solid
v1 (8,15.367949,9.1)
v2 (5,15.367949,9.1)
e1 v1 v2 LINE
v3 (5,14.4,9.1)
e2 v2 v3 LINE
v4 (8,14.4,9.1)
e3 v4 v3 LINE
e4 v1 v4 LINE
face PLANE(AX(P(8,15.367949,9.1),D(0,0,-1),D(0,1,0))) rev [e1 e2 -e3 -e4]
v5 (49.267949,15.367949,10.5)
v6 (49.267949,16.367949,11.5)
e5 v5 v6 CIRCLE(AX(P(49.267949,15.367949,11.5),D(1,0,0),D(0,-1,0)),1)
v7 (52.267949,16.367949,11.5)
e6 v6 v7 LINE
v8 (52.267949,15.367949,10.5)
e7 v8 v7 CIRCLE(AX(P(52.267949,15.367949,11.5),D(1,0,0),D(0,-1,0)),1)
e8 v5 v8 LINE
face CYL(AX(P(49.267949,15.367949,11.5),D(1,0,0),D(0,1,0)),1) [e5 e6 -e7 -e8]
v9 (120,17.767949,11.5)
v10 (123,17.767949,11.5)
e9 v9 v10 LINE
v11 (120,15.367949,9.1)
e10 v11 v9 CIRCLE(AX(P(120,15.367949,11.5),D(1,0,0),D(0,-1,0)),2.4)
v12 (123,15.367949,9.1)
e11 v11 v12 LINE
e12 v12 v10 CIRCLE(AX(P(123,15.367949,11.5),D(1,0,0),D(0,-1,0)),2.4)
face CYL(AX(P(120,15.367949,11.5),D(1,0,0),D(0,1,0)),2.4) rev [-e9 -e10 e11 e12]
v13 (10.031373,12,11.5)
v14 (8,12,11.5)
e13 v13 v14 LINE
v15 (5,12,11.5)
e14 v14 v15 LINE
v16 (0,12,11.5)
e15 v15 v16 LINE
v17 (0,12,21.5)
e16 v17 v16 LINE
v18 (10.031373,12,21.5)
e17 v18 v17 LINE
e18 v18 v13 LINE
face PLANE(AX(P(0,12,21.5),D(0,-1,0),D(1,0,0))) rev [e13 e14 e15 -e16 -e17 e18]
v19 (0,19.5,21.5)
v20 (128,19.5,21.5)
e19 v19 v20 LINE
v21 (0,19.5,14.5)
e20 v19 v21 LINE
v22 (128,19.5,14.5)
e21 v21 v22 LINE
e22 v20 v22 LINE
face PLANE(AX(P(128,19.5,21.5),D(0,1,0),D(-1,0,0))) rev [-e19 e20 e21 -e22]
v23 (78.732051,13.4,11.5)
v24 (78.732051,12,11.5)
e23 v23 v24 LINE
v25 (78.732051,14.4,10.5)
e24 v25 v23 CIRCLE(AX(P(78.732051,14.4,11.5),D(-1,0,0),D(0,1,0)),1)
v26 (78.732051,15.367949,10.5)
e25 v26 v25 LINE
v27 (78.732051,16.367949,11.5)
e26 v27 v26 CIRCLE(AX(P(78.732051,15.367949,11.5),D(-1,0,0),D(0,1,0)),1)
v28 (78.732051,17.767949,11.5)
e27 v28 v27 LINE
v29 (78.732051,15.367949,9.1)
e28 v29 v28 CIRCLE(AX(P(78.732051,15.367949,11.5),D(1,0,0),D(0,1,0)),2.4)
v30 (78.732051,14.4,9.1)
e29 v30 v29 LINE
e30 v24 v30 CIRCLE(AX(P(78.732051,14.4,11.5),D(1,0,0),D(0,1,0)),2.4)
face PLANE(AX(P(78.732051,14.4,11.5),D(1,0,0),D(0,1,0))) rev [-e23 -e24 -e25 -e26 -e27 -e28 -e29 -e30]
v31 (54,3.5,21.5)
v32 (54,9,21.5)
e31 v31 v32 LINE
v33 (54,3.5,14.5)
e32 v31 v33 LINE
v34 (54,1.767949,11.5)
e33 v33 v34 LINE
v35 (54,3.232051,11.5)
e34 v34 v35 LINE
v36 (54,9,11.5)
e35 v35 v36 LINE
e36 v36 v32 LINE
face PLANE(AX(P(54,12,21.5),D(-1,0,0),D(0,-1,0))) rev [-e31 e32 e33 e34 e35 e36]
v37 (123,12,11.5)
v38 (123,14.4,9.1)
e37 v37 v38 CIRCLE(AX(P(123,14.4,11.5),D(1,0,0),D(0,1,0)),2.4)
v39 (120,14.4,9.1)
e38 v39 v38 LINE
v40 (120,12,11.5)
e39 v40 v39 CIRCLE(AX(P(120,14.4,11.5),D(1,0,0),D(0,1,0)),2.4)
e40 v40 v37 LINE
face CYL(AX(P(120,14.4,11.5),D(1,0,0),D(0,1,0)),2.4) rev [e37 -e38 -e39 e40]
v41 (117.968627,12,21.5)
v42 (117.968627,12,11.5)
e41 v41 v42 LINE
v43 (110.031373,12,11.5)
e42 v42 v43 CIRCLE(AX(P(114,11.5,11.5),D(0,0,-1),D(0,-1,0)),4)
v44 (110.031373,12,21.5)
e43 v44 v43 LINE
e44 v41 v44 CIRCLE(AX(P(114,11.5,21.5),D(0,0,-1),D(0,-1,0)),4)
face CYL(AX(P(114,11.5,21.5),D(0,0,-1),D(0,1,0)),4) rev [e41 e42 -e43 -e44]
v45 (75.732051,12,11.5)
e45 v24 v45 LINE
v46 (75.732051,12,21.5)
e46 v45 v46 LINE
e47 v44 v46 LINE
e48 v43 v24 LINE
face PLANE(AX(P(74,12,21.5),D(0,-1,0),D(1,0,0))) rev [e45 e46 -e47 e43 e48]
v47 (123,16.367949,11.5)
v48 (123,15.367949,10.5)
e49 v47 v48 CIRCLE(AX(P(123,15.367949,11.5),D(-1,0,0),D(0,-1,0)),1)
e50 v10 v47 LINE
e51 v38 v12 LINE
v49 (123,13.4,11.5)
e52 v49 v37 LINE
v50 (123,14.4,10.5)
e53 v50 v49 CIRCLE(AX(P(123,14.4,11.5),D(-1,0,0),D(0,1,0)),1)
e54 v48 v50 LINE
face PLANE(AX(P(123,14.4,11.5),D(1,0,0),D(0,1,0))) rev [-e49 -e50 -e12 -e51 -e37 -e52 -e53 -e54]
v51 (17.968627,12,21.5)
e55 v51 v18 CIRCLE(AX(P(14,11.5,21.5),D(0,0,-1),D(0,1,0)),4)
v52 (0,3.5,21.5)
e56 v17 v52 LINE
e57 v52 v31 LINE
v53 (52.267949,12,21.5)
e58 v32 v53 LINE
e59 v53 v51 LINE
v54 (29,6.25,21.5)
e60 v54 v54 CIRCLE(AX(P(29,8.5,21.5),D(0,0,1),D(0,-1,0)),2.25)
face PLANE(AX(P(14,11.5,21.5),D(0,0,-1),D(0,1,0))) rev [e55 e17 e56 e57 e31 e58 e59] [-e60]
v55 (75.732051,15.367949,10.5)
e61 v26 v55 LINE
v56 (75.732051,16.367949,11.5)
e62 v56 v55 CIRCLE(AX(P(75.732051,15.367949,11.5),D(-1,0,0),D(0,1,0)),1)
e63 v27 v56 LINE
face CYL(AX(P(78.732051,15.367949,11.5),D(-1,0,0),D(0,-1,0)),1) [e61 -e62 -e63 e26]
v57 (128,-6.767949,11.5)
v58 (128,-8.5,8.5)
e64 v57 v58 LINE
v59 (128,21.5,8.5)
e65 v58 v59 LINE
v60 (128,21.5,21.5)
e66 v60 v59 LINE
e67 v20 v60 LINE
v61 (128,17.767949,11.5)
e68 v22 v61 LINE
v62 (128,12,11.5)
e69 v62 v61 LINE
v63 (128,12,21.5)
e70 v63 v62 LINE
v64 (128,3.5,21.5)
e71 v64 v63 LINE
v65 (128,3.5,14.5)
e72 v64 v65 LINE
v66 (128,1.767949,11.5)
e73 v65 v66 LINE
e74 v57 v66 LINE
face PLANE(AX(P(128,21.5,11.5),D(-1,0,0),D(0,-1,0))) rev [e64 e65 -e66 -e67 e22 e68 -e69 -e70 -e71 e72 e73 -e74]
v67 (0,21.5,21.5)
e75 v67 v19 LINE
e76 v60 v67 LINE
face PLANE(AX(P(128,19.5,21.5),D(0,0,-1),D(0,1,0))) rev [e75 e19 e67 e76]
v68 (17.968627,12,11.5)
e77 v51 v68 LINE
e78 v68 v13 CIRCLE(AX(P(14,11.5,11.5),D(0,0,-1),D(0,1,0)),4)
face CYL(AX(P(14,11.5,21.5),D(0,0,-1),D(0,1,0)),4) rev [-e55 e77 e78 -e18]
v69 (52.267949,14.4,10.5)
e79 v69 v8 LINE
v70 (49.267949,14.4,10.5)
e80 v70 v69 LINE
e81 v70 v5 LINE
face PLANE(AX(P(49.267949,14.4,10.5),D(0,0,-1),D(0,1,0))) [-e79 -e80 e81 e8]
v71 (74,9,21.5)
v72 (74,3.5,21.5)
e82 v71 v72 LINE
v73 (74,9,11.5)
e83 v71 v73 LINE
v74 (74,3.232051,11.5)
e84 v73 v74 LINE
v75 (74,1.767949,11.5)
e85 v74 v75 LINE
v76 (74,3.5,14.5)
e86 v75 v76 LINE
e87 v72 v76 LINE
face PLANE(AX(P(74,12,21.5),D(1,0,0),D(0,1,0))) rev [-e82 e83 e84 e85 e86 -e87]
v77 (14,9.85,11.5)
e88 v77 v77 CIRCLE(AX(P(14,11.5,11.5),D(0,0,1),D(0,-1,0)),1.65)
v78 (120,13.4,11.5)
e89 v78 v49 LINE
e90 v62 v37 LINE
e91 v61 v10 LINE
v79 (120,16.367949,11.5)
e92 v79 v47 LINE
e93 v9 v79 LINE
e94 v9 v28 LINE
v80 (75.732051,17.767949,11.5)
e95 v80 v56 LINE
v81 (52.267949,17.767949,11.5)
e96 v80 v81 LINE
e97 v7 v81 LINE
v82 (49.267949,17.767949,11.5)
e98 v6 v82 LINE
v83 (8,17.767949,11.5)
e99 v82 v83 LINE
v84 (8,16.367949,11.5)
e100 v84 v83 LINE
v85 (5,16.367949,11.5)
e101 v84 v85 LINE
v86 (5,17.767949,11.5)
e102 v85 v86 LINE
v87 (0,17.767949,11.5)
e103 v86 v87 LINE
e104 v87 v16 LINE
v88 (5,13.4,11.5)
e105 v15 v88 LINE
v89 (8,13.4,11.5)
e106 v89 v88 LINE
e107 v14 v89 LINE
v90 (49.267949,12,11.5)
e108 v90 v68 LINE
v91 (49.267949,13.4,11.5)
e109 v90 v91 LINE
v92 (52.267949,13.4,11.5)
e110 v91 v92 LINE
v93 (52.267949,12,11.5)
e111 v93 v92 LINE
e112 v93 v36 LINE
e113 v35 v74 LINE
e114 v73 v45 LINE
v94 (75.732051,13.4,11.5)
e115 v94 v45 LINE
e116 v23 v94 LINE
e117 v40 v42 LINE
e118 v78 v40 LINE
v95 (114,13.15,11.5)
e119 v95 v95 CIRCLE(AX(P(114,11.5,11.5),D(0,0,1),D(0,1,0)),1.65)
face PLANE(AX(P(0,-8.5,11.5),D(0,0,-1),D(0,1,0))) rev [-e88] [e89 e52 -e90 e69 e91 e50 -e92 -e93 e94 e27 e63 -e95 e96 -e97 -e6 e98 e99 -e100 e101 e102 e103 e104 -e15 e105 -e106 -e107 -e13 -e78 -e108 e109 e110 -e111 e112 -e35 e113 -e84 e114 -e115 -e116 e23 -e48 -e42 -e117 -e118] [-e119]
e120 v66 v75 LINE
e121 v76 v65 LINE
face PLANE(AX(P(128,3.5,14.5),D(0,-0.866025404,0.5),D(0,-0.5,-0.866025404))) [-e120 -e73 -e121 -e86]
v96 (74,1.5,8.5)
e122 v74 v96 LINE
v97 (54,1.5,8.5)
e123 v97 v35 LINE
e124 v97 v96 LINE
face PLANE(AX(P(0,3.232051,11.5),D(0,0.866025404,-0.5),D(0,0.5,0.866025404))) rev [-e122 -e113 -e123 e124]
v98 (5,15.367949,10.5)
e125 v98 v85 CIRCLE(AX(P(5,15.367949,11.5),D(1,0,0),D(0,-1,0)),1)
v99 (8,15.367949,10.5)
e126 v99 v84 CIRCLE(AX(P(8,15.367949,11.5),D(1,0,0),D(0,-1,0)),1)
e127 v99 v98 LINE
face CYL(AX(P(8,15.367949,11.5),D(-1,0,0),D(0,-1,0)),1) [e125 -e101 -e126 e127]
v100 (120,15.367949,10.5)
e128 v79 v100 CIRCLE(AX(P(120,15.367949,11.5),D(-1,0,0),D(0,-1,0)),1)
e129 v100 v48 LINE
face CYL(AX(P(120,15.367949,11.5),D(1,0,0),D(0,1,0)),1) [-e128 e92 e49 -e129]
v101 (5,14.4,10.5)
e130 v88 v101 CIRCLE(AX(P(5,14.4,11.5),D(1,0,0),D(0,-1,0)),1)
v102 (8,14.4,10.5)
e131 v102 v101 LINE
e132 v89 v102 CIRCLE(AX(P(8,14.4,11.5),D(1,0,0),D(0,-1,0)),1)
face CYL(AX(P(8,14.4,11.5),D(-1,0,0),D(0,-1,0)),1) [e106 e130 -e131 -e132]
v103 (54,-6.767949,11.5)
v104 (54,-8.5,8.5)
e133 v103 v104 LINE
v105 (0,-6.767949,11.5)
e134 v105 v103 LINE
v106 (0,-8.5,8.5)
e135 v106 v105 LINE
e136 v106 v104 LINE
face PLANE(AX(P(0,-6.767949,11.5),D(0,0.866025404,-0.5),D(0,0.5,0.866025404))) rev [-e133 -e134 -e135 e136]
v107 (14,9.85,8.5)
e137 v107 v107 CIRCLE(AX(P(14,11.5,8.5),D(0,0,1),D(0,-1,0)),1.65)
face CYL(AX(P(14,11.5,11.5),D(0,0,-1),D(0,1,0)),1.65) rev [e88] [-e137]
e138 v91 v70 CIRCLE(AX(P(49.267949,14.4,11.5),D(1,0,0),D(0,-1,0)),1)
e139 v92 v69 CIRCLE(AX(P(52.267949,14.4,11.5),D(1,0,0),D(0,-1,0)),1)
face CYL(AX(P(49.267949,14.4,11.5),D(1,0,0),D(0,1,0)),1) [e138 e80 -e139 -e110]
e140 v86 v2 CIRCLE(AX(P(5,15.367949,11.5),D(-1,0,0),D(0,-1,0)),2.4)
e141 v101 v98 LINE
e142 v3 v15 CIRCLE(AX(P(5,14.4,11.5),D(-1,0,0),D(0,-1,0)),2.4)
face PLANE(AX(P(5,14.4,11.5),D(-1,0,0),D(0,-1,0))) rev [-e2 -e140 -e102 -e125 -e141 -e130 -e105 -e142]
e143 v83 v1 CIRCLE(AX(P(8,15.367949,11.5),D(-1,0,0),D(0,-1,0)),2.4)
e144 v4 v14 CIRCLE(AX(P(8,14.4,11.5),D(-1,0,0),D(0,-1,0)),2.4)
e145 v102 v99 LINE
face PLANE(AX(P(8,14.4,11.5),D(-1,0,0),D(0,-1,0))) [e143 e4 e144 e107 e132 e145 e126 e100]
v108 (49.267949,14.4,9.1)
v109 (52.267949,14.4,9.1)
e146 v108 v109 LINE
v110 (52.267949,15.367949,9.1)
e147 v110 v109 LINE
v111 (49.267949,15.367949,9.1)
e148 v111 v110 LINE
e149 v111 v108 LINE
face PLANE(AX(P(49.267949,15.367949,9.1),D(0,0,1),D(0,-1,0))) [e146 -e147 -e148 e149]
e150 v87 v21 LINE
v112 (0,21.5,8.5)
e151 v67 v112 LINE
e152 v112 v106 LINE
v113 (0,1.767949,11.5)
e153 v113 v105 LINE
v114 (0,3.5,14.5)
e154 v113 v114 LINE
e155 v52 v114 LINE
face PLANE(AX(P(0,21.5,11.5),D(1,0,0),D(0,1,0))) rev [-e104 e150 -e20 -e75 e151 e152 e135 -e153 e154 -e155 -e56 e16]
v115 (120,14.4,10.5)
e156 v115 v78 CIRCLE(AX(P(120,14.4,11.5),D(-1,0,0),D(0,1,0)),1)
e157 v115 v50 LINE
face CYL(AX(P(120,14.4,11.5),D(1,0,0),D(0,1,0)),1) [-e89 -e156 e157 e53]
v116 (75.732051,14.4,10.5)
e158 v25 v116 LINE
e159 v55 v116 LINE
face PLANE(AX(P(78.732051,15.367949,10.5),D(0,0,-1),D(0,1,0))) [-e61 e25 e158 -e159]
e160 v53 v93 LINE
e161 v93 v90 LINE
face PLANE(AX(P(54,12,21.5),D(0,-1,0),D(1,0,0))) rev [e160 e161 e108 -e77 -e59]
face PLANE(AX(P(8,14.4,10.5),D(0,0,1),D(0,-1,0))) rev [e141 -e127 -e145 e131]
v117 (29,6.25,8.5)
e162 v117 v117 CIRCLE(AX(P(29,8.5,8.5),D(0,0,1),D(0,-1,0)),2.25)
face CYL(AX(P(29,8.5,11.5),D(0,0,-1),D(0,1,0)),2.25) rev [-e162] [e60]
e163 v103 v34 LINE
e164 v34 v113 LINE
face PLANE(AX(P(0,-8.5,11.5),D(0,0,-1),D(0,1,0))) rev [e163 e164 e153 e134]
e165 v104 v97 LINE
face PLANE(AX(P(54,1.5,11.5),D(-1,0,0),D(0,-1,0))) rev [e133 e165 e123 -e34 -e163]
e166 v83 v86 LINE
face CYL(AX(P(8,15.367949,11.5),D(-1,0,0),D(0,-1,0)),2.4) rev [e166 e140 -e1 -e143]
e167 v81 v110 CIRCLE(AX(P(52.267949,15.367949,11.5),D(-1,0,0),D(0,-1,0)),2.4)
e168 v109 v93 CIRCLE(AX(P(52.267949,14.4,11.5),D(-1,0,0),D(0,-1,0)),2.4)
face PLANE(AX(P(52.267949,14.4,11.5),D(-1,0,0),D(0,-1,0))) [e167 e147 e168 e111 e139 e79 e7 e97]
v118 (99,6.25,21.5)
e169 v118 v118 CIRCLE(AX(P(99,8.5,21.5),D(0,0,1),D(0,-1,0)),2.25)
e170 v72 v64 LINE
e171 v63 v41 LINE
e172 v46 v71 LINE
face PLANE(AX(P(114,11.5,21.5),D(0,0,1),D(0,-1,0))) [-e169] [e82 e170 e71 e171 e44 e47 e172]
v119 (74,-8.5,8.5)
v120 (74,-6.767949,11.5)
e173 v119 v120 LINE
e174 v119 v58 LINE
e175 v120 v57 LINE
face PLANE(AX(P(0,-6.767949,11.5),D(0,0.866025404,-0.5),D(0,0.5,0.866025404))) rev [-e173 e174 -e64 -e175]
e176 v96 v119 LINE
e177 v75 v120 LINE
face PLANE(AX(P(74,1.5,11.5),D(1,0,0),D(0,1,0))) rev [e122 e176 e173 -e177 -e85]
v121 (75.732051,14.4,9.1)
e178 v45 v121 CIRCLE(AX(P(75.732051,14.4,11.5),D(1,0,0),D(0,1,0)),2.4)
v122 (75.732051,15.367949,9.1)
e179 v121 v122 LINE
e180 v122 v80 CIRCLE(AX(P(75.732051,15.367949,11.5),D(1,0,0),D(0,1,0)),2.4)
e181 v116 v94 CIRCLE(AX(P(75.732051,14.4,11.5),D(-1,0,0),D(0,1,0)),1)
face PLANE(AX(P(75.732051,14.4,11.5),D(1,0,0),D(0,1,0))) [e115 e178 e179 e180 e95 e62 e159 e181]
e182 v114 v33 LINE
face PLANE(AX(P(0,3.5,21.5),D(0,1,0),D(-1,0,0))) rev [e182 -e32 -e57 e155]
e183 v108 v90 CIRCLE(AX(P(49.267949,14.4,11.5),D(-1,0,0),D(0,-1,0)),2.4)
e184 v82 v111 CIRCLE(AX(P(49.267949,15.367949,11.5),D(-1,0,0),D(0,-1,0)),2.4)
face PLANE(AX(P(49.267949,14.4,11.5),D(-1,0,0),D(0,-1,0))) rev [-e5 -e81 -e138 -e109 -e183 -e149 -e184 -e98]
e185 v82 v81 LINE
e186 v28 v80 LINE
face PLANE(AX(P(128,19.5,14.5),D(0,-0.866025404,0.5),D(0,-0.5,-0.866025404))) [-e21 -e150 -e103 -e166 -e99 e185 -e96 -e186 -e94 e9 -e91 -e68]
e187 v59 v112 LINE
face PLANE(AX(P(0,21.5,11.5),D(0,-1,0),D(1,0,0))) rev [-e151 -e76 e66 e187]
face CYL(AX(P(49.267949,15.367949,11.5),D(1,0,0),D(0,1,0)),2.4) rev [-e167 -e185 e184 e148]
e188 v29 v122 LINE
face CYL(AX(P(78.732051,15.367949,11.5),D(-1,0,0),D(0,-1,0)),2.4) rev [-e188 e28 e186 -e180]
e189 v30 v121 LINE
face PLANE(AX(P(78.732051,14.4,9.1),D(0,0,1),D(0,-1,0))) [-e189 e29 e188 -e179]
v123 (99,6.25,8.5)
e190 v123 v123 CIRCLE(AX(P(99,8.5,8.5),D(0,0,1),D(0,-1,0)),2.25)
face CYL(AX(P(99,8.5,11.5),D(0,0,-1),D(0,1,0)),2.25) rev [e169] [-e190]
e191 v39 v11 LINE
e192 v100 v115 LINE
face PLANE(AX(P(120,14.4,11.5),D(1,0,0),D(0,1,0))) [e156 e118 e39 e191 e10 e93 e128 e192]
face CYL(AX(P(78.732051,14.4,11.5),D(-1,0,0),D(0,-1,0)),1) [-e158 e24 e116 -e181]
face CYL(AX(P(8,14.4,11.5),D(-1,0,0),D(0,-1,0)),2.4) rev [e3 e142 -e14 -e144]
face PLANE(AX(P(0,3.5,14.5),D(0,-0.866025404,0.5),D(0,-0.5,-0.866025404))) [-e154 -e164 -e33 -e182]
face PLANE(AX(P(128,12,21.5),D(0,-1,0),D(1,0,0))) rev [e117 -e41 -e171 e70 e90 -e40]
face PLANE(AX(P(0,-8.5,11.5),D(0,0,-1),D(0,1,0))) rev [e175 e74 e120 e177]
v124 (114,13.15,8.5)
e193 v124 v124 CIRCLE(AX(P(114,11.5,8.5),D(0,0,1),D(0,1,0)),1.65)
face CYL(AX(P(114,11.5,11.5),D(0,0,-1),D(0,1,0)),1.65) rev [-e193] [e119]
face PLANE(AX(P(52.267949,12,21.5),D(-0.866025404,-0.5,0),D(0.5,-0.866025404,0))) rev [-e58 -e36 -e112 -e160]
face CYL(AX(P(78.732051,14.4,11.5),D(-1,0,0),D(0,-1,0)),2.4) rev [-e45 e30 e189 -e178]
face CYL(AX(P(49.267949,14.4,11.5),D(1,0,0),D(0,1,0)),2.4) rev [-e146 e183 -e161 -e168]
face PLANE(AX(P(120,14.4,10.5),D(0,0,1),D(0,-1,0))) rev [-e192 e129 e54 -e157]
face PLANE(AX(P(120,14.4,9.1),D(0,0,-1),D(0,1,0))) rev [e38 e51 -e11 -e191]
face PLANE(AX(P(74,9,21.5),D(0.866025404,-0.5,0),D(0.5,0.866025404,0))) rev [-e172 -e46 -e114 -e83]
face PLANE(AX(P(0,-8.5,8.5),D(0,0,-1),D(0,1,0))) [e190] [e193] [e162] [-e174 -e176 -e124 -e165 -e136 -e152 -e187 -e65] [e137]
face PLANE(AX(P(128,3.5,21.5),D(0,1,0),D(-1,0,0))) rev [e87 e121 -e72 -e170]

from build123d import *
from OCP.BRepFilletAPI import BRepFilletAPI_MakeChamfer

# Parameters (mm, degrees)
SKIZZE1_R                          = 1.65
SKIZZE1_R_2                        = 2.25
AUFSATZ_LINEAR_AUSTRAGEN1_DEPTH    = 3
SKIZZE2_W                          = 128
SKIZZE2_H                          = 2
SKIZZE2_R                          = 2.25
AUFSATZ_LINEAR_AUSTRAGEN2_DEPTH    = 10
FASE1_SIZE                         = 1.732050808
FASE1_SIZE_2                       = 3
FASE2_SIZE                         = 1.732050808
FASE2_SIZE_2                       = 3
SCHNITT_LINEAR_START               = -5
SCHNITT_LINEAR_AUSTRAGEN1_DEPTH    = 3
SCHNITT_LINEAR_START_2             = -41.26795
SCHNITT_LINEAR_AUSTRAGEN2_DEPTH    = 3
SCHNITT_LINEAR_START_3             = -8
SCHNITT_LINEAR_AUSTRAGEN3_DEPTH    = 3
SCHNITT_LINEAR_START_4             = -44.26795
SCHNITT_LINEAR_AUSTRAGEN4_DEPTH    = 3
K_RPER_VERSCHIEBEN_KOPIEREN1_ANGLE = 90


# Some blends are built 0.0001 mm under size
with BuildPart() as part:
    # Skizze1 → Aufsatz-Linear austragen1 (new body)
    with BuildSketch(Plane(origin=(0, 0, 0), x_dir=(1, 0, 0), z_dir=(0, 1, 0))):
        Polygon((54, -20), (74, -20), (74, -30), (128, -30), (128, 0), (0, 0), (0, -30), (54, -30), align=None)
        with Locations(Location((114, -10, 0), (0, 0, 90))):
            Circle(SKIZZE1_R, mode=Mode.SUBTRACT)
        with Locations(Location((14, -10, 0), (0, 0, 270))):
            Circle(SKIZZE1_R, mode=Mode.SUBTRACT)
        with Locations(Location((29, -13, 0), (0, 0, 270))):
            Circle(SKIZZE1_R_2, mode=Mode.SUBTRACT)
        with Locations(Location((99, -13, 0), (0, 0, 270))):
            Circle(SKIZZE1_R_2, mode=Mode.SUBTRACT)
    extrude(amount=AUFSATZ_LINEAR_AUSTRAGEN1_DEPTH)

    # Skizze2 → Aufsatz-Linear austragen2 (add)
    # profile 1 of 3: a face of its own
    with BuildSketch(Plane(origin=(0, 3, 0), x_dir=(1, 0, 0), z_dir=(0, 1, 0))):
        with Locations((64, -1)):
            Rectangle(SKIZZE2_W, SKIZZE2_H)
    # profile 2 of 3: a face of its own
    with BuildSketch(Plane(origin=(0, 3, 0), x_dir=(1, 0, 0), z_dir=(0, 1, 0))):
        with BuildLine():
            Line((0, -9.5), (10.031373033, -9.5))
            ThreePointArc((10.031373033, -9.5), (14, -14), (17.968626967, -9.5))
            Line((17.968626967, -9.5), (54, -9.5))
            Line((54, -9.5), (54, -18))
            Line((54, -18), (0, -18))
            Line((0, -18), (0, -9.5))
        make_face()
        with Locations(Location((29, -13, 0), (0, 0, 270))):
            Circle(SKIZZE2_R, mode=Mode.SUBTRACT)
    # profile 3 of 3: a face of its own
    with BuildSketch(Plane(origin=(0, 3, 0), x_dir=(1, 0, 0), z_dir=(0, 1, 0))):
        with BuildLine():
            Line((128, -9.5), (128, -18))
            Line((128, -18), (74, -18))
            Line((74, -18), (74, -9.5))
            Line((74, -9.5), (110.031373033, -9.5))
            ThreePointArc((110.031373033, -9.5), (114, -14), (117.968626967, -9.5))
            Line((117.968626967, -9.5), (128, -9.5))
        make_face()
        with Locations(Location((99, -13, 0), (0, 0, 270))):
            Circle(SKIZZE2_R, mode=Mode.SUBTRACT)
    extrude(amount=AUFSATZ_LINEAR_AUSTRAGEN2_DEPTH)

    # Fase1
    fase1_edges_1 = [part.edges().sort_by_distance(p)[0] for p in [
        (54, 8, 9.5),
    ]]
    fase1_side_1 = [part.faces().sort_by_distance(p)[0] for p in [
        (53.965358984, 8, 9.5),
    ]]
    fase1_edges_2 = [part.edges().sort_by_distance(p)[0] for p in [
        (74, 8, 9.5),
    ]]
    fase1_side_2 = [part.faces().sort_by_distance(p)[0] for p in [
        (74, 8, 9.534641016),
    ]]
    fase1_edges_3 = [part.edges().sort_by_distance(p)[0] for p in [
        (64, 3, 2),
    ]]
    fase1_side_3 = [part.faces().sort_by_distance(p)[0] for p in [
        (64, 3, 2.034641016),
    ]]
    fase1_edges_4 = [part.edges().sort_by_distance(p)[0] for p in [
        (27, 3, 18),
    ]]
    fase1_side_4 = [part.faces().sort_by_distance(p)[0] for p in [
        (27, 3, 18.034641016),
    ]]
    fase1_edges_5 = [part.edges().sort_by_distance(p)[0] for p in [
        (101, 3, 18),
    ]]
    fase1_side_5 = [part.faces().sort_by_distance(p)[0] for p in [
        (101, 3, 18.034641016),
    ]]
    fase1_edges_6 = [part.edges().sort_by_distance(p)[0] for p in [
        (27, 3, 30),
    ]]
    fase1_side_6 = [part.faces().sort_by_distance(p)[0] for p in [
        (27, 3, 29.965358984),
    ]]
    fase1_edges_7 = [part.edges().sort_by_distance(p)[0] for p in [
        (101, 3, 30),
    ]]
    fase1_side_7 = [part.faces().sort_by_distance(p)[0] for p in [
        (101, 3, 29.965358984),
    ]]
    fase1 = BRepFilletAPI_MakeChamfer(part.part.solid().wrapped)
    for e in fase1_edges_1:
        fase1.Add(FASE1_SIZE - 0.0001, FASE1_SIZE_2 - 0.0001, e.wrapped, fase1_side_1[0].wrapped)
    for e in fase1_edges_2:
        fase1.Add(FASE1_SIZE_2 - 0.0001, FASE1_SIZE - 0.0001, e.wrapped, fase1_side_2[0].wrapped)
    for e in fase1_edges_3:
        fase1.Add(FASE1_SIZE - 0.0001, FASE1_SIZE_2 - 0.0001, e.wrapped, fase1_side_3[0].wrapped)
    for e in fase1_edges_4:
        fase1.Add(FASE1_SIZE - 0.0001, FASE1_SIZE_2 - 0.0001, e.wrapped, fase1_side_4[0].wrapped)
    for e in fase1_edges_5:
        fase1.Add(FASE1_SIZE - 0.0001, FASE1_SIZE_2 - 0.0001, e.wrapped, fase1_side_5[0].wrapped)
    for e in fase1_edges_6:
        fase1.Add(FASE1_SIZE - 0.0001, FASE1_SIZE_2 - 0.0001, e.wrapped, fase1_side_6[0].wrapped)
    for e in fase1_edges_7:
        fase1.Add(FASE1_SIZE - 0.0001, FASE1_SIZE_2 - 0.0001, e.wrapped, fase1_side_7[0].wrapped)
    add(Compound.cast(fase1.Shape()), mode=Mode.REPLACE)  # a hair under: the kernel refuses the full size

    # Fase2
    # the kernel refuses this chamfer: 3, 1.732050808 mm, written as the material it takes off along each edge
    with BuildSketch(Plane(origin=(54, 3, 20), x_dir=(0, 0.057893862402670915, -0.9983227437537925), z_dir=(1, 0, 0))) as fase2_piece_1:
        Polygon((FASE2_SIZE * 0.998322743505, -FASE2_SIZE * 0.0578938623883), (-FASE2_SIZE_2 * 0.0578938624027, -FASE2_SIZE_2 * 0.998322743754), (0, 0), align=None)
    extrude(amount=20, mode=Mode.SUBTRACT)

    # Skizze3 → Schnitt-Linear austragen1 (cut)
    with BuildSketch(Plane(origin=(128, 0, 0), x_dir=(0, 0, -1), z_dir=(1, 0, 0)).offset(SCHNITT_LINEAR_START)):
        with BuildLine():
            Line((-9.5, 3), (-8.1, 3))
            ThreePointArc((-8.1, 3), (-7.807106781, 2.292893219), (-7.1, 2))
            Line((-7.1, 2), (-6.132050808, 2))
            ThreePointArc((-6.132050808, 2), (-5.424944026, 2.292893219), (-5.132050808, 3))
            Line((-5.132050808, 3), (-3.732050808, 3))
            ThreePointArc((-3.732050808, 3), (-4.434994533, 1.302943725), (-6.132050808, 0.6))
            Line((-6.132050808, 0.6), (-7.1, 0.6))
            ThreePointArc((-7.1, 0.6), (-8.797056275, 1.302943725), (-9.5, 3))
        make_face()
    extrude(amount=-SCHNITT_LINEAR_AUSTRAGEN1_DEPTH, mode=Mode.SUBTRACT)

    # Skizze4 → Schnitt-Linear austragen2 (cut)
    with BuildSketch(Plane(origin=(120, 0, 0), x_dir=(0, 0, -1), z_dir=(1, 0, 0)).offset(SCHNITT_LINEAR_START_2)):
        with BuildLine():
            Line((-7.1, 0.6), (-6.132050808, 0.6))
            ThreePointArc((-6.132050808, 0.6), (-4.434994533, 1.302943725), (-3.732050808, 3))
            Line((-3.732050808, 3), (-5.132050808, 3))
            ThreePointArc((-5.132050808, 3), (-5.424944026, 2.292893219), (-6.132050808, 2))
            Line((-6.132050808, 2), (-7.1, 2))
            ThreePointArc((-7.1, 2), (-7.807106781, 2.292893219), (-8.1, 3))
            Line((-8.1, 3), (-9.5, 3))
            ThreePointArc((-9.5, 3), (-8.797056275, 1.302943725), (-7.1, 0.6))
        make_face()
    extrude(amount=-SCHNITT_LINEAR_AUSTRAGEN2_DEPTH, mode=Mode.SUBTRACT)

    # Skizze5 → Schnitt-Linear austragen3 (cut)
    with BuildSketch(Plane.ZY.offset(SCHNITT_LINEAR_START_3)):
        with BuildLine():
            Line((9.5, 3), (8.1, 3))
            ThreePointArc((8.1, 3), (7.807106781, 2.292893219), (7.1, 2))
            Line((7.1, 2), (6.132050808, 2))
            ThreePointArc((6.132050808, 2), (5.424944026, 2.292893219), (5.132050808, 3))
            Line((5.132050808, 3), (3.732050808, 3))
            ThreePointArc((3.732050808, 3), (4.434994533, 1.302943725), (6.132050808, 0.6))
            Line((6.132050808, 0.6), (7.1, 0.6))
            ThreePointArc((7.1, 0.6), (8.797056275, 1.302943725), (9.5, 3))
        make_face()
    extrude(amount=SCHNITT_LINEAR_AUSTRAGEN3_DEPTH, mode=Mode.SUBTRACT)

    # Skizze6 → Schnitt-Linear austragen4 (cut)
    with BuildSketch(Plane.ZY.offset(-8).offset(SCHNITT_LINEAR_START_4)):
        with BuildLine():
            Line((9.5, 3), (8.1, 3))
            ThreePointArc((8.1, 3), (7.807106781, 2.292893219), (7.1, 2))
            Line((7.1, 2), (6.132050808, 2))
            ThreePointArc((6.132050808, 2), (5.424944026, 2.292893219), (5.132050808, 3))
            Line((5.132050808, 3), (3.732050808, 3))
            ThreePointArc((3.732050808, 3), (4.434994533, 1.302943725), (6.132050808, 0.6))
            Line((6.132050808, 0.6), (7.1, 0.6))
            ThreePointArc((7.1, 0.6), (8.797056275, 1.302943725), (9.5, 3))
        make_face()
    extrude(amount=SCHNITT_LINEAR_AUSTRAGEN4_DEPTH, mode=Mode.SUBTRACT)


with BuildPart() as part_1:
    # Körper-Verschieben/Kopieren1: moved
    add(part.part.rotate(Axis((0, 6.5, 15), (1, 0, 0)), K_RPER_VERSCHIEBEN_KOPIEREN1_ANGLE))


solid = part_1.part
